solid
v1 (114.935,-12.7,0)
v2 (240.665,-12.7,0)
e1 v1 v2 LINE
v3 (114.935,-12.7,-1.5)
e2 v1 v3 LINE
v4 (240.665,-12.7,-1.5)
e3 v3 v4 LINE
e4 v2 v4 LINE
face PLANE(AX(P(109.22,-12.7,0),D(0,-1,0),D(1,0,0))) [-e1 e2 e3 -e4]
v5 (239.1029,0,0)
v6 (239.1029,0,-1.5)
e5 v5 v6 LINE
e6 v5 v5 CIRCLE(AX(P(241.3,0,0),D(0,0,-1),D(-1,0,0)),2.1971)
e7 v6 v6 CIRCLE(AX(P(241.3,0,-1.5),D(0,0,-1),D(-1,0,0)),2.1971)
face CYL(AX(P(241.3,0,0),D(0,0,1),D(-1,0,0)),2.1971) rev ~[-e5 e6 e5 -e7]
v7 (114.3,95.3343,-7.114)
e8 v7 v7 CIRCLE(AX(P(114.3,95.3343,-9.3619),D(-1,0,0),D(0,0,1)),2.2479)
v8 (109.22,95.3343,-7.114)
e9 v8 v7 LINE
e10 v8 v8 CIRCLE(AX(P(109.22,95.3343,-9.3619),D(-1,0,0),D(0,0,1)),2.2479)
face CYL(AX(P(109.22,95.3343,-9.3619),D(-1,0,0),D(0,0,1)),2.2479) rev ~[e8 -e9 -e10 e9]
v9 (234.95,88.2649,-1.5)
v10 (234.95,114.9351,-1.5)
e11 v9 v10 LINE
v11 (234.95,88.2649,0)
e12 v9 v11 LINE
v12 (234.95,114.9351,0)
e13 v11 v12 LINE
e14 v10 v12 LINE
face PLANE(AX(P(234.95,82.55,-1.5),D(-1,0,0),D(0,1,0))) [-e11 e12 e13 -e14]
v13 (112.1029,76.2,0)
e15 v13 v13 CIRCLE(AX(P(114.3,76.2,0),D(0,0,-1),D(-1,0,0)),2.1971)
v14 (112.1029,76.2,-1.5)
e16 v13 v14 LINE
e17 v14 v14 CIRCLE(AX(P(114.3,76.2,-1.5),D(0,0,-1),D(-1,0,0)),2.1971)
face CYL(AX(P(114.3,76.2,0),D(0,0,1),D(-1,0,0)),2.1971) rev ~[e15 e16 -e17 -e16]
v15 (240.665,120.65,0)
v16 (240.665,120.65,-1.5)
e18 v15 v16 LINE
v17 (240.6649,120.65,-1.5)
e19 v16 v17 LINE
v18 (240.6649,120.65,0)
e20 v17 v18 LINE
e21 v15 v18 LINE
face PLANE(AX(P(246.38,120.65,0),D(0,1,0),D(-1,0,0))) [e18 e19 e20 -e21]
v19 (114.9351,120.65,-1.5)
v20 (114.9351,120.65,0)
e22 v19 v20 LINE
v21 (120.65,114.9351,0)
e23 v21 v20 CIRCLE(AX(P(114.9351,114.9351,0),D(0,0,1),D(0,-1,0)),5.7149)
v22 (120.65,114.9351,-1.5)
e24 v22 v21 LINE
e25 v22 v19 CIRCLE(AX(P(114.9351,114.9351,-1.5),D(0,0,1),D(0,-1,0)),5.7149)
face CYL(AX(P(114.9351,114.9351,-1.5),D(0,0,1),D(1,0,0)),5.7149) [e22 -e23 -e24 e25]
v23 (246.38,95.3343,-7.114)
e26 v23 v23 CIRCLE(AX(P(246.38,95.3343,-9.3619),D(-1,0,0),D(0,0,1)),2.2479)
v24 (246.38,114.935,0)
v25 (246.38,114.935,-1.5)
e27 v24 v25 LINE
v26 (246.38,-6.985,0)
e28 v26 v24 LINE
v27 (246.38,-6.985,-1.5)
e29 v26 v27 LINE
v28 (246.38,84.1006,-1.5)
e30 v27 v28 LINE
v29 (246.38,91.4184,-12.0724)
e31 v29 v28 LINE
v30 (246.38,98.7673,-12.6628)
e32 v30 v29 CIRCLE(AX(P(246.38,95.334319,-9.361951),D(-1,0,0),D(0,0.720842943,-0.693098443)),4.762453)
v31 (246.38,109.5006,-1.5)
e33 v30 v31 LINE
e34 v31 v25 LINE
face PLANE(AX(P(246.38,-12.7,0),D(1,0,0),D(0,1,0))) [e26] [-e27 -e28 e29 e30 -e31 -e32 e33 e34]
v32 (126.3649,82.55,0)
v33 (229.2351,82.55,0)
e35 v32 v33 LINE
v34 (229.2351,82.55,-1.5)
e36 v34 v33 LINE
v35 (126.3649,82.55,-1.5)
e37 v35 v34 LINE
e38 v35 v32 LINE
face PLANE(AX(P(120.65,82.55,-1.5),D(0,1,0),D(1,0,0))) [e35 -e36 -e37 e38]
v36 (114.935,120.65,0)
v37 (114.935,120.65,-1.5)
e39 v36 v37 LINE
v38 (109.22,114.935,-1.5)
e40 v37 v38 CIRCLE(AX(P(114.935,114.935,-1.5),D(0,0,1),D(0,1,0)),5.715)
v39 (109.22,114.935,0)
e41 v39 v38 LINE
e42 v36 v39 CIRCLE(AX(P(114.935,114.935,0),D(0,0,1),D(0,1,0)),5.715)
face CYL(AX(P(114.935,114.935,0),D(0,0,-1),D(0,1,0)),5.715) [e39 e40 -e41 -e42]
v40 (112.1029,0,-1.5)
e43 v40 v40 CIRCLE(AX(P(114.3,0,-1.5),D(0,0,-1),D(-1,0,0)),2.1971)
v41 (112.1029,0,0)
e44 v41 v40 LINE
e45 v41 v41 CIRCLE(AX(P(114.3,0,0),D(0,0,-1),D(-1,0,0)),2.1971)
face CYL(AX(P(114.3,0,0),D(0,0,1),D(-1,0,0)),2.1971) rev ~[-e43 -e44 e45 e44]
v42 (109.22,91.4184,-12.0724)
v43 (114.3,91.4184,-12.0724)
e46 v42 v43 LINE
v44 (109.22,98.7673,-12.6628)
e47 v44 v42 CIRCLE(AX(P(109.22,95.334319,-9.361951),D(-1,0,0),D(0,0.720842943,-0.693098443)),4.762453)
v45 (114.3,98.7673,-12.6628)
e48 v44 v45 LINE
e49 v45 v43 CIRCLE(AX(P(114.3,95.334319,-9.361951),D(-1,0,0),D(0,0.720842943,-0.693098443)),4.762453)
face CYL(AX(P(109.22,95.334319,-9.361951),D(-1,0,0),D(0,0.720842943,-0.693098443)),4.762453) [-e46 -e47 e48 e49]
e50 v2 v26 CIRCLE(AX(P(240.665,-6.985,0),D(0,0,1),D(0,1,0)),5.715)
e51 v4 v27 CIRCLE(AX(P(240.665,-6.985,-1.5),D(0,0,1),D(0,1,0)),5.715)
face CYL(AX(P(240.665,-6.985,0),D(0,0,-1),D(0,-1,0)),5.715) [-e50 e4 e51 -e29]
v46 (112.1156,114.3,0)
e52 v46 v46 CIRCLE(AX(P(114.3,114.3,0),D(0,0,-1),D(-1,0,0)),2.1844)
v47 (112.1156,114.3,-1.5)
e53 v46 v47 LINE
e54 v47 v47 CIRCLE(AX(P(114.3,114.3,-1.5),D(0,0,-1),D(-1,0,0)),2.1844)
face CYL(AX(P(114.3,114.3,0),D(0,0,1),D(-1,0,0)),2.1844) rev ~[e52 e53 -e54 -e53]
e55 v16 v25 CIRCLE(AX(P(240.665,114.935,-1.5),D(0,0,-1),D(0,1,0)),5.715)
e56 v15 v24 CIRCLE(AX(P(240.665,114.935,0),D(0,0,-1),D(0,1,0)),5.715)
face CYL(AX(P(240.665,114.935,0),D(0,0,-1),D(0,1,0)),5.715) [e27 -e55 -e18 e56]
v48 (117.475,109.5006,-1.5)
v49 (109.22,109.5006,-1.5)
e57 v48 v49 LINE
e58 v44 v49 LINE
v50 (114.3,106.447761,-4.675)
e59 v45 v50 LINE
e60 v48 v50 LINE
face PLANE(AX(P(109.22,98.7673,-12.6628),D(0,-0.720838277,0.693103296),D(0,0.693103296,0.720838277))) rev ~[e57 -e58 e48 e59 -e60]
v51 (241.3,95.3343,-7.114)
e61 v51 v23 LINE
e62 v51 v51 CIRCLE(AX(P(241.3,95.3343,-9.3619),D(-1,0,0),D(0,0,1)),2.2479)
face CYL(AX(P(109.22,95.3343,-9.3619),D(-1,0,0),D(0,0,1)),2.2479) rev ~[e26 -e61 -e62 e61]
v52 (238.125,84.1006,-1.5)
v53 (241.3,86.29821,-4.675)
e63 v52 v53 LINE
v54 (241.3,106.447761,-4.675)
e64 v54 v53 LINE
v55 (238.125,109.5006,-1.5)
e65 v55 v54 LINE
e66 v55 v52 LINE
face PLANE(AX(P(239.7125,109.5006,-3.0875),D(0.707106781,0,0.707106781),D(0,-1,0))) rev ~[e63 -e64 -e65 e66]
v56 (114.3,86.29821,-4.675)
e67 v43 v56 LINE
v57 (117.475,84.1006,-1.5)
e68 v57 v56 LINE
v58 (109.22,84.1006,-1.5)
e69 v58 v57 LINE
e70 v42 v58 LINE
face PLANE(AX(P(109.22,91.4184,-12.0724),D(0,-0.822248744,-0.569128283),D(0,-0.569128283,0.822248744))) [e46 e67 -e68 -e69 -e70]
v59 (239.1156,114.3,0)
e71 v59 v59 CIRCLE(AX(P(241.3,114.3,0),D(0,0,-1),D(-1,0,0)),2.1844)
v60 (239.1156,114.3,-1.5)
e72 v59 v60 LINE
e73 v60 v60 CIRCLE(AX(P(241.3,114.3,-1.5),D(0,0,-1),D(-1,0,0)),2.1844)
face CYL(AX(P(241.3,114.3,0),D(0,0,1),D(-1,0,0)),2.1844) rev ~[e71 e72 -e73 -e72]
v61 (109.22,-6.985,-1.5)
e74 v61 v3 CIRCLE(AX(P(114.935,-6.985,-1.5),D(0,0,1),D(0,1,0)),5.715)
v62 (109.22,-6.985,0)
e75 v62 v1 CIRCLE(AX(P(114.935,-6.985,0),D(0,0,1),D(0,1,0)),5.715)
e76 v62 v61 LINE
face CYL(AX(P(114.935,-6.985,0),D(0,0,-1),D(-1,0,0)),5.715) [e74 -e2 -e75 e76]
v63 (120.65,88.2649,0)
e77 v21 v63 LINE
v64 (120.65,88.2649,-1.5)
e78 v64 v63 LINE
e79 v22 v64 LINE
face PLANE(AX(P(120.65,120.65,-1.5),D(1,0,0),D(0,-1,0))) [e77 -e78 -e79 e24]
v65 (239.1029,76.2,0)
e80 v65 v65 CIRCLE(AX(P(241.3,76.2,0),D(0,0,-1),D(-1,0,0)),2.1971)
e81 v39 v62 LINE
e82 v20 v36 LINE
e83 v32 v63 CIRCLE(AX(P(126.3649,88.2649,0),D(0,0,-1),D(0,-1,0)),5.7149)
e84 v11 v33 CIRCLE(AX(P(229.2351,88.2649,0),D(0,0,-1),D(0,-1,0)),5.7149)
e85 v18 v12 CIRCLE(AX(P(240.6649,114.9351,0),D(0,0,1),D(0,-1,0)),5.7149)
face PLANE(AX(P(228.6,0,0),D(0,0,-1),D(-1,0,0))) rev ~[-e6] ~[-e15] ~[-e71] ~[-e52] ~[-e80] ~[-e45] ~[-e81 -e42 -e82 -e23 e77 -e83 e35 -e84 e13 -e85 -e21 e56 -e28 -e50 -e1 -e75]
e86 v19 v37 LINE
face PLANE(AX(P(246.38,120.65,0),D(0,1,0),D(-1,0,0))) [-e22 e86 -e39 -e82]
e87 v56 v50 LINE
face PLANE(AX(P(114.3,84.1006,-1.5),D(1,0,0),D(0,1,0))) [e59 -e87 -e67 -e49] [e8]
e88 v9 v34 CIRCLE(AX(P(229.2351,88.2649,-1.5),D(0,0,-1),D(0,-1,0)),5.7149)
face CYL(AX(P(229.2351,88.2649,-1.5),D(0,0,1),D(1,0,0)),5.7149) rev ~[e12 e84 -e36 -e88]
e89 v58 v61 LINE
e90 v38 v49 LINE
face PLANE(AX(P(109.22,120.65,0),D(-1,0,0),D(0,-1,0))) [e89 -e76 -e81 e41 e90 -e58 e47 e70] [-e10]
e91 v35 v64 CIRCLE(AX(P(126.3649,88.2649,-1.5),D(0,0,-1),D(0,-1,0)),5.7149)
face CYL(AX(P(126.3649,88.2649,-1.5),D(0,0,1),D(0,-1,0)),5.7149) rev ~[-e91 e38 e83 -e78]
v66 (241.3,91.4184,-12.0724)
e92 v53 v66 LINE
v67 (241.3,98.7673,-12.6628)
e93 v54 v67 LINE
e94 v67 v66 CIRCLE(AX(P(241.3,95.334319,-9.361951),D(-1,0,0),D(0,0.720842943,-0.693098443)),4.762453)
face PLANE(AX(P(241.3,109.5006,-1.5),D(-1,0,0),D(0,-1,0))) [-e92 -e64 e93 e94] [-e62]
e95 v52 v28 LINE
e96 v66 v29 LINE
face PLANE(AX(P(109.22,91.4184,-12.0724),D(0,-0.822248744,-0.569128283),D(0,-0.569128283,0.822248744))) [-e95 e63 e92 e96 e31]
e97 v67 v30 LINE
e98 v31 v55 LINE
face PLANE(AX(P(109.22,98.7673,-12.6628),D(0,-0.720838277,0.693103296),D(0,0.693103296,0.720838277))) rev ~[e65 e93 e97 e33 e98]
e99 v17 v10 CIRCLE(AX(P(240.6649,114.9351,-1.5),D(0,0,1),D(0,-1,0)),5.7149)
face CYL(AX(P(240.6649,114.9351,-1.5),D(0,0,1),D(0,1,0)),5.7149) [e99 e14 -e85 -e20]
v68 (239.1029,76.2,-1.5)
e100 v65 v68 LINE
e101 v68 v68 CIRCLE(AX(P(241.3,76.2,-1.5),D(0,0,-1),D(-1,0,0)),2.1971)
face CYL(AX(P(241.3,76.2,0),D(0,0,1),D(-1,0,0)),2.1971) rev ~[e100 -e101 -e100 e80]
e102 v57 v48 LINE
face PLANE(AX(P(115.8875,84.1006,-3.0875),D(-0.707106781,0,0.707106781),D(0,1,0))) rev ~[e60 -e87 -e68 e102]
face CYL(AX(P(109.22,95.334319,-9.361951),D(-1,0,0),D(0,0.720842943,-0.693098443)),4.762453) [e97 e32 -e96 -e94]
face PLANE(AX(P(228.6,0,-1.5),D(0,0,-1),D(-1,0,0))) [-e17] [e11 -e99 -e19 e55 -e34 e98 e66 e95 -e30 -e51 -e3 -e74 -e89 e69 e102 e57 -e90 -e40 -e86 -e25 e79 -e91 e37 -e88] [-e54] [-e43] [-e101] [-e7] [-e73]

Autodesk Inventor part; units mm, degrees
ref_plane "YZ Plane" through (0, 0, 0) normal (1, 0, 0) x (0, 1, 0)
ref_plane "XZ Plane" through (0, 0, 0) normal (0, 1, 0) x (-1, 0, 0)
ref_plane "XY Plane" through (0, 0, 0) normal (0, 0, 1) x (1, 0, 0)
ref_plane "Work Plane1" through (0, 0, 0) normal (0, 0, 1) x (1, 0, 0)
sketch "Sketch1" plane through (228.6, 0, 0) normal (0, 0, -1) x (-1, 0, 0)
  circle A0 centre (-12.7, 0) radius 2.1971 projected
  circle A1 centre (114.3, 0) radius 2.1971 projected
  circle A2 centre (-12.7, 76.2) radius 2.1971 projected
  circle A3 centre (114.3, 76.2) radius 2.1971 projected
  line L0 (-17.78, 120.65) -> (119.38, 120.65)
  line L1 (119.38, 120.65) -> (119.38, -12.7)
  line L2 (119.38, -12.7) -> (-17.78, -12.7)
  line L3 (-17.78, -12.7) -> (-17.78, 120.65)
  circle A4 centre (114.3, 114.3) radius 2.1844 projected
  circle A5 centre (-12.7, 114.3) radius 2.1844 projected
  point P0 (228.6, 0)
  dimension "d0" = 12.7
  dimension "d2" = 5.08
  dimension "d3" = 5.08
  dimension "d6" = 6.35
extrude "Extrusion1" add sketch "Sketch1" along normal blind 1.5
fillet "Fillet2" radius 5.715 4 edges at (246.38, 120.65, -0.75) (109.22, 120.65, -0.75) (109.22, -12.7, -0.75) (246.38, -12.7, -0.75)
sketch "Sketch7" plane through (109.22, -6.985, 0) normal (-1, 0, 0) x (0, 0, 1)
  circle A0 centre (-9.3619, 102.3193) radius 2.2479 projected
  arc A1 (-12.6628, 105.7523) -> (-12.0724, 98.4034) centre (-9.3619, 102.3193) ccw
  line L0 (-12.6628, 105.7523) -> (-1.5, 116.4856)
  line L1 (-12.0724, 98.4034) -> (-1.5, 91.0856)
  line L2 (-1.5, 0) -> (-1.5, 121.92) projected
  point P0 (0, 6.985)
  dimension "d38" = 9.525
  dimension "d39" = 25.4
  dimension "d40" = 78.566
extrude "Extrusion6" add sketch "Sketch7" against normal up to surface (137.16 mm away)
sketch "Sketch8" plane through (228.6, 0, -1.5) normal (0, 0, -1) x (-1, 0, 0)
  arc A0 (-17.78, -6.985) -> (-12.065, -12.7) centre (-12.065, -6.985) ccw projected
  line L0 (-17.78, 114.935) -> (-17.78, -6.985) projected
  arc A1 (-12.065, 120.65) -> (-17.78, 114.935) centre (-12.065, 114.935) ccw projected
  line L1 (113.665, 120.65) -> (-12.065, 120.65) projected
  arc A2 (119.38, 114.935) -> (113.665, 120.65) centre (113.665, 114.935) ccw projected
  line L2 (119.38, -6.985) -> (119.38, 114.935) projected
  arc A3 (113.665, -12.7) -> (119.38, -6.985) centre (113.665, -6.985) ccw projected
  line L3 (-12.065, -12.7) -> (113.665, -12.7) projected
  circle A4 centre (-12.7, 114.3) radius 2.1844 projected
  circle A5 centre (114.3, 114.3) radius 2.1844 projected
  circle A6 centre (114.3, 76.2) radius 2.1971 projected
  circle A7 centre (-12.7, 76.2) radius 2.1971 projected
  circle A8 centre (114.3, 0) radius 2.1971 projected
  circle A9 centre (-12.7, 0) radius 2.1971 projected
  line L4 (119.38, 84.1006) -> (-17.78, 84.1006) projected
  line L5 (-17.78, 109.5006) -> (119.38, 109.5006) projected
  line L6 (-12.7, 109.5006) -> (-12.7, 84.1006)
  line L7 (114.3, 84.1006) -> (114.3, 109.5006)
  point P0 (228.6, 0)
  dimension "d43" = 5.08
  dimension "d44" = 5.08
extrude "Extrusion7" cut sketch "Sketch8" along normal through all contours L6 L5 L7 L4
chamfer "Chamfer2" distance 3.175 angle 45 2 edges at (114.3, 96.8006, -1.5) (241.3, 96.8006, -1.5)
sketch "Sketch9" plane through (228.6, 0, -1.5) normal (0, 0, -1) x (-1, 0, 0)
  line L0 (113.665, 120.65) -> (-12.065, 120.65) projected
  line L1 (-6.35, 120.65) -> (107.95, 120.65)
  line L2 (107.95, 120.65) -> (107.95, 82.55)
  line L3 (107.95, 82.55) -> (-6.35, 82.55)
  line L4 (-6.35, 82.55) -> (-6.35, 120.65)
  line L5 (119.38, -6.985) -> (119.38, 84.1006) projected
  line L6 (-17.78, 84.1006) -> (-17.78, -6.985) projected
  point P0 (228.6, 0)
  dimension "d50" = 38.1
  dimension "d51" = 114.3
  dimension "d52" = 11.43
  dimension "d53" = 11.43
extrude "Extrusion8" cut sketch "Sketch9" against normal through all
fillet "Fillet3" radius 5.715 4 edges at (234.95, 82.55, -0.75) (120.65, 82.55, -0.75) (120.65, 120.65, -0.75) (234.95, 120.65, -0.75)
equation "\"d52\" = d53"
properties part number "bottom rails" material "Acetal Resin, Black"
